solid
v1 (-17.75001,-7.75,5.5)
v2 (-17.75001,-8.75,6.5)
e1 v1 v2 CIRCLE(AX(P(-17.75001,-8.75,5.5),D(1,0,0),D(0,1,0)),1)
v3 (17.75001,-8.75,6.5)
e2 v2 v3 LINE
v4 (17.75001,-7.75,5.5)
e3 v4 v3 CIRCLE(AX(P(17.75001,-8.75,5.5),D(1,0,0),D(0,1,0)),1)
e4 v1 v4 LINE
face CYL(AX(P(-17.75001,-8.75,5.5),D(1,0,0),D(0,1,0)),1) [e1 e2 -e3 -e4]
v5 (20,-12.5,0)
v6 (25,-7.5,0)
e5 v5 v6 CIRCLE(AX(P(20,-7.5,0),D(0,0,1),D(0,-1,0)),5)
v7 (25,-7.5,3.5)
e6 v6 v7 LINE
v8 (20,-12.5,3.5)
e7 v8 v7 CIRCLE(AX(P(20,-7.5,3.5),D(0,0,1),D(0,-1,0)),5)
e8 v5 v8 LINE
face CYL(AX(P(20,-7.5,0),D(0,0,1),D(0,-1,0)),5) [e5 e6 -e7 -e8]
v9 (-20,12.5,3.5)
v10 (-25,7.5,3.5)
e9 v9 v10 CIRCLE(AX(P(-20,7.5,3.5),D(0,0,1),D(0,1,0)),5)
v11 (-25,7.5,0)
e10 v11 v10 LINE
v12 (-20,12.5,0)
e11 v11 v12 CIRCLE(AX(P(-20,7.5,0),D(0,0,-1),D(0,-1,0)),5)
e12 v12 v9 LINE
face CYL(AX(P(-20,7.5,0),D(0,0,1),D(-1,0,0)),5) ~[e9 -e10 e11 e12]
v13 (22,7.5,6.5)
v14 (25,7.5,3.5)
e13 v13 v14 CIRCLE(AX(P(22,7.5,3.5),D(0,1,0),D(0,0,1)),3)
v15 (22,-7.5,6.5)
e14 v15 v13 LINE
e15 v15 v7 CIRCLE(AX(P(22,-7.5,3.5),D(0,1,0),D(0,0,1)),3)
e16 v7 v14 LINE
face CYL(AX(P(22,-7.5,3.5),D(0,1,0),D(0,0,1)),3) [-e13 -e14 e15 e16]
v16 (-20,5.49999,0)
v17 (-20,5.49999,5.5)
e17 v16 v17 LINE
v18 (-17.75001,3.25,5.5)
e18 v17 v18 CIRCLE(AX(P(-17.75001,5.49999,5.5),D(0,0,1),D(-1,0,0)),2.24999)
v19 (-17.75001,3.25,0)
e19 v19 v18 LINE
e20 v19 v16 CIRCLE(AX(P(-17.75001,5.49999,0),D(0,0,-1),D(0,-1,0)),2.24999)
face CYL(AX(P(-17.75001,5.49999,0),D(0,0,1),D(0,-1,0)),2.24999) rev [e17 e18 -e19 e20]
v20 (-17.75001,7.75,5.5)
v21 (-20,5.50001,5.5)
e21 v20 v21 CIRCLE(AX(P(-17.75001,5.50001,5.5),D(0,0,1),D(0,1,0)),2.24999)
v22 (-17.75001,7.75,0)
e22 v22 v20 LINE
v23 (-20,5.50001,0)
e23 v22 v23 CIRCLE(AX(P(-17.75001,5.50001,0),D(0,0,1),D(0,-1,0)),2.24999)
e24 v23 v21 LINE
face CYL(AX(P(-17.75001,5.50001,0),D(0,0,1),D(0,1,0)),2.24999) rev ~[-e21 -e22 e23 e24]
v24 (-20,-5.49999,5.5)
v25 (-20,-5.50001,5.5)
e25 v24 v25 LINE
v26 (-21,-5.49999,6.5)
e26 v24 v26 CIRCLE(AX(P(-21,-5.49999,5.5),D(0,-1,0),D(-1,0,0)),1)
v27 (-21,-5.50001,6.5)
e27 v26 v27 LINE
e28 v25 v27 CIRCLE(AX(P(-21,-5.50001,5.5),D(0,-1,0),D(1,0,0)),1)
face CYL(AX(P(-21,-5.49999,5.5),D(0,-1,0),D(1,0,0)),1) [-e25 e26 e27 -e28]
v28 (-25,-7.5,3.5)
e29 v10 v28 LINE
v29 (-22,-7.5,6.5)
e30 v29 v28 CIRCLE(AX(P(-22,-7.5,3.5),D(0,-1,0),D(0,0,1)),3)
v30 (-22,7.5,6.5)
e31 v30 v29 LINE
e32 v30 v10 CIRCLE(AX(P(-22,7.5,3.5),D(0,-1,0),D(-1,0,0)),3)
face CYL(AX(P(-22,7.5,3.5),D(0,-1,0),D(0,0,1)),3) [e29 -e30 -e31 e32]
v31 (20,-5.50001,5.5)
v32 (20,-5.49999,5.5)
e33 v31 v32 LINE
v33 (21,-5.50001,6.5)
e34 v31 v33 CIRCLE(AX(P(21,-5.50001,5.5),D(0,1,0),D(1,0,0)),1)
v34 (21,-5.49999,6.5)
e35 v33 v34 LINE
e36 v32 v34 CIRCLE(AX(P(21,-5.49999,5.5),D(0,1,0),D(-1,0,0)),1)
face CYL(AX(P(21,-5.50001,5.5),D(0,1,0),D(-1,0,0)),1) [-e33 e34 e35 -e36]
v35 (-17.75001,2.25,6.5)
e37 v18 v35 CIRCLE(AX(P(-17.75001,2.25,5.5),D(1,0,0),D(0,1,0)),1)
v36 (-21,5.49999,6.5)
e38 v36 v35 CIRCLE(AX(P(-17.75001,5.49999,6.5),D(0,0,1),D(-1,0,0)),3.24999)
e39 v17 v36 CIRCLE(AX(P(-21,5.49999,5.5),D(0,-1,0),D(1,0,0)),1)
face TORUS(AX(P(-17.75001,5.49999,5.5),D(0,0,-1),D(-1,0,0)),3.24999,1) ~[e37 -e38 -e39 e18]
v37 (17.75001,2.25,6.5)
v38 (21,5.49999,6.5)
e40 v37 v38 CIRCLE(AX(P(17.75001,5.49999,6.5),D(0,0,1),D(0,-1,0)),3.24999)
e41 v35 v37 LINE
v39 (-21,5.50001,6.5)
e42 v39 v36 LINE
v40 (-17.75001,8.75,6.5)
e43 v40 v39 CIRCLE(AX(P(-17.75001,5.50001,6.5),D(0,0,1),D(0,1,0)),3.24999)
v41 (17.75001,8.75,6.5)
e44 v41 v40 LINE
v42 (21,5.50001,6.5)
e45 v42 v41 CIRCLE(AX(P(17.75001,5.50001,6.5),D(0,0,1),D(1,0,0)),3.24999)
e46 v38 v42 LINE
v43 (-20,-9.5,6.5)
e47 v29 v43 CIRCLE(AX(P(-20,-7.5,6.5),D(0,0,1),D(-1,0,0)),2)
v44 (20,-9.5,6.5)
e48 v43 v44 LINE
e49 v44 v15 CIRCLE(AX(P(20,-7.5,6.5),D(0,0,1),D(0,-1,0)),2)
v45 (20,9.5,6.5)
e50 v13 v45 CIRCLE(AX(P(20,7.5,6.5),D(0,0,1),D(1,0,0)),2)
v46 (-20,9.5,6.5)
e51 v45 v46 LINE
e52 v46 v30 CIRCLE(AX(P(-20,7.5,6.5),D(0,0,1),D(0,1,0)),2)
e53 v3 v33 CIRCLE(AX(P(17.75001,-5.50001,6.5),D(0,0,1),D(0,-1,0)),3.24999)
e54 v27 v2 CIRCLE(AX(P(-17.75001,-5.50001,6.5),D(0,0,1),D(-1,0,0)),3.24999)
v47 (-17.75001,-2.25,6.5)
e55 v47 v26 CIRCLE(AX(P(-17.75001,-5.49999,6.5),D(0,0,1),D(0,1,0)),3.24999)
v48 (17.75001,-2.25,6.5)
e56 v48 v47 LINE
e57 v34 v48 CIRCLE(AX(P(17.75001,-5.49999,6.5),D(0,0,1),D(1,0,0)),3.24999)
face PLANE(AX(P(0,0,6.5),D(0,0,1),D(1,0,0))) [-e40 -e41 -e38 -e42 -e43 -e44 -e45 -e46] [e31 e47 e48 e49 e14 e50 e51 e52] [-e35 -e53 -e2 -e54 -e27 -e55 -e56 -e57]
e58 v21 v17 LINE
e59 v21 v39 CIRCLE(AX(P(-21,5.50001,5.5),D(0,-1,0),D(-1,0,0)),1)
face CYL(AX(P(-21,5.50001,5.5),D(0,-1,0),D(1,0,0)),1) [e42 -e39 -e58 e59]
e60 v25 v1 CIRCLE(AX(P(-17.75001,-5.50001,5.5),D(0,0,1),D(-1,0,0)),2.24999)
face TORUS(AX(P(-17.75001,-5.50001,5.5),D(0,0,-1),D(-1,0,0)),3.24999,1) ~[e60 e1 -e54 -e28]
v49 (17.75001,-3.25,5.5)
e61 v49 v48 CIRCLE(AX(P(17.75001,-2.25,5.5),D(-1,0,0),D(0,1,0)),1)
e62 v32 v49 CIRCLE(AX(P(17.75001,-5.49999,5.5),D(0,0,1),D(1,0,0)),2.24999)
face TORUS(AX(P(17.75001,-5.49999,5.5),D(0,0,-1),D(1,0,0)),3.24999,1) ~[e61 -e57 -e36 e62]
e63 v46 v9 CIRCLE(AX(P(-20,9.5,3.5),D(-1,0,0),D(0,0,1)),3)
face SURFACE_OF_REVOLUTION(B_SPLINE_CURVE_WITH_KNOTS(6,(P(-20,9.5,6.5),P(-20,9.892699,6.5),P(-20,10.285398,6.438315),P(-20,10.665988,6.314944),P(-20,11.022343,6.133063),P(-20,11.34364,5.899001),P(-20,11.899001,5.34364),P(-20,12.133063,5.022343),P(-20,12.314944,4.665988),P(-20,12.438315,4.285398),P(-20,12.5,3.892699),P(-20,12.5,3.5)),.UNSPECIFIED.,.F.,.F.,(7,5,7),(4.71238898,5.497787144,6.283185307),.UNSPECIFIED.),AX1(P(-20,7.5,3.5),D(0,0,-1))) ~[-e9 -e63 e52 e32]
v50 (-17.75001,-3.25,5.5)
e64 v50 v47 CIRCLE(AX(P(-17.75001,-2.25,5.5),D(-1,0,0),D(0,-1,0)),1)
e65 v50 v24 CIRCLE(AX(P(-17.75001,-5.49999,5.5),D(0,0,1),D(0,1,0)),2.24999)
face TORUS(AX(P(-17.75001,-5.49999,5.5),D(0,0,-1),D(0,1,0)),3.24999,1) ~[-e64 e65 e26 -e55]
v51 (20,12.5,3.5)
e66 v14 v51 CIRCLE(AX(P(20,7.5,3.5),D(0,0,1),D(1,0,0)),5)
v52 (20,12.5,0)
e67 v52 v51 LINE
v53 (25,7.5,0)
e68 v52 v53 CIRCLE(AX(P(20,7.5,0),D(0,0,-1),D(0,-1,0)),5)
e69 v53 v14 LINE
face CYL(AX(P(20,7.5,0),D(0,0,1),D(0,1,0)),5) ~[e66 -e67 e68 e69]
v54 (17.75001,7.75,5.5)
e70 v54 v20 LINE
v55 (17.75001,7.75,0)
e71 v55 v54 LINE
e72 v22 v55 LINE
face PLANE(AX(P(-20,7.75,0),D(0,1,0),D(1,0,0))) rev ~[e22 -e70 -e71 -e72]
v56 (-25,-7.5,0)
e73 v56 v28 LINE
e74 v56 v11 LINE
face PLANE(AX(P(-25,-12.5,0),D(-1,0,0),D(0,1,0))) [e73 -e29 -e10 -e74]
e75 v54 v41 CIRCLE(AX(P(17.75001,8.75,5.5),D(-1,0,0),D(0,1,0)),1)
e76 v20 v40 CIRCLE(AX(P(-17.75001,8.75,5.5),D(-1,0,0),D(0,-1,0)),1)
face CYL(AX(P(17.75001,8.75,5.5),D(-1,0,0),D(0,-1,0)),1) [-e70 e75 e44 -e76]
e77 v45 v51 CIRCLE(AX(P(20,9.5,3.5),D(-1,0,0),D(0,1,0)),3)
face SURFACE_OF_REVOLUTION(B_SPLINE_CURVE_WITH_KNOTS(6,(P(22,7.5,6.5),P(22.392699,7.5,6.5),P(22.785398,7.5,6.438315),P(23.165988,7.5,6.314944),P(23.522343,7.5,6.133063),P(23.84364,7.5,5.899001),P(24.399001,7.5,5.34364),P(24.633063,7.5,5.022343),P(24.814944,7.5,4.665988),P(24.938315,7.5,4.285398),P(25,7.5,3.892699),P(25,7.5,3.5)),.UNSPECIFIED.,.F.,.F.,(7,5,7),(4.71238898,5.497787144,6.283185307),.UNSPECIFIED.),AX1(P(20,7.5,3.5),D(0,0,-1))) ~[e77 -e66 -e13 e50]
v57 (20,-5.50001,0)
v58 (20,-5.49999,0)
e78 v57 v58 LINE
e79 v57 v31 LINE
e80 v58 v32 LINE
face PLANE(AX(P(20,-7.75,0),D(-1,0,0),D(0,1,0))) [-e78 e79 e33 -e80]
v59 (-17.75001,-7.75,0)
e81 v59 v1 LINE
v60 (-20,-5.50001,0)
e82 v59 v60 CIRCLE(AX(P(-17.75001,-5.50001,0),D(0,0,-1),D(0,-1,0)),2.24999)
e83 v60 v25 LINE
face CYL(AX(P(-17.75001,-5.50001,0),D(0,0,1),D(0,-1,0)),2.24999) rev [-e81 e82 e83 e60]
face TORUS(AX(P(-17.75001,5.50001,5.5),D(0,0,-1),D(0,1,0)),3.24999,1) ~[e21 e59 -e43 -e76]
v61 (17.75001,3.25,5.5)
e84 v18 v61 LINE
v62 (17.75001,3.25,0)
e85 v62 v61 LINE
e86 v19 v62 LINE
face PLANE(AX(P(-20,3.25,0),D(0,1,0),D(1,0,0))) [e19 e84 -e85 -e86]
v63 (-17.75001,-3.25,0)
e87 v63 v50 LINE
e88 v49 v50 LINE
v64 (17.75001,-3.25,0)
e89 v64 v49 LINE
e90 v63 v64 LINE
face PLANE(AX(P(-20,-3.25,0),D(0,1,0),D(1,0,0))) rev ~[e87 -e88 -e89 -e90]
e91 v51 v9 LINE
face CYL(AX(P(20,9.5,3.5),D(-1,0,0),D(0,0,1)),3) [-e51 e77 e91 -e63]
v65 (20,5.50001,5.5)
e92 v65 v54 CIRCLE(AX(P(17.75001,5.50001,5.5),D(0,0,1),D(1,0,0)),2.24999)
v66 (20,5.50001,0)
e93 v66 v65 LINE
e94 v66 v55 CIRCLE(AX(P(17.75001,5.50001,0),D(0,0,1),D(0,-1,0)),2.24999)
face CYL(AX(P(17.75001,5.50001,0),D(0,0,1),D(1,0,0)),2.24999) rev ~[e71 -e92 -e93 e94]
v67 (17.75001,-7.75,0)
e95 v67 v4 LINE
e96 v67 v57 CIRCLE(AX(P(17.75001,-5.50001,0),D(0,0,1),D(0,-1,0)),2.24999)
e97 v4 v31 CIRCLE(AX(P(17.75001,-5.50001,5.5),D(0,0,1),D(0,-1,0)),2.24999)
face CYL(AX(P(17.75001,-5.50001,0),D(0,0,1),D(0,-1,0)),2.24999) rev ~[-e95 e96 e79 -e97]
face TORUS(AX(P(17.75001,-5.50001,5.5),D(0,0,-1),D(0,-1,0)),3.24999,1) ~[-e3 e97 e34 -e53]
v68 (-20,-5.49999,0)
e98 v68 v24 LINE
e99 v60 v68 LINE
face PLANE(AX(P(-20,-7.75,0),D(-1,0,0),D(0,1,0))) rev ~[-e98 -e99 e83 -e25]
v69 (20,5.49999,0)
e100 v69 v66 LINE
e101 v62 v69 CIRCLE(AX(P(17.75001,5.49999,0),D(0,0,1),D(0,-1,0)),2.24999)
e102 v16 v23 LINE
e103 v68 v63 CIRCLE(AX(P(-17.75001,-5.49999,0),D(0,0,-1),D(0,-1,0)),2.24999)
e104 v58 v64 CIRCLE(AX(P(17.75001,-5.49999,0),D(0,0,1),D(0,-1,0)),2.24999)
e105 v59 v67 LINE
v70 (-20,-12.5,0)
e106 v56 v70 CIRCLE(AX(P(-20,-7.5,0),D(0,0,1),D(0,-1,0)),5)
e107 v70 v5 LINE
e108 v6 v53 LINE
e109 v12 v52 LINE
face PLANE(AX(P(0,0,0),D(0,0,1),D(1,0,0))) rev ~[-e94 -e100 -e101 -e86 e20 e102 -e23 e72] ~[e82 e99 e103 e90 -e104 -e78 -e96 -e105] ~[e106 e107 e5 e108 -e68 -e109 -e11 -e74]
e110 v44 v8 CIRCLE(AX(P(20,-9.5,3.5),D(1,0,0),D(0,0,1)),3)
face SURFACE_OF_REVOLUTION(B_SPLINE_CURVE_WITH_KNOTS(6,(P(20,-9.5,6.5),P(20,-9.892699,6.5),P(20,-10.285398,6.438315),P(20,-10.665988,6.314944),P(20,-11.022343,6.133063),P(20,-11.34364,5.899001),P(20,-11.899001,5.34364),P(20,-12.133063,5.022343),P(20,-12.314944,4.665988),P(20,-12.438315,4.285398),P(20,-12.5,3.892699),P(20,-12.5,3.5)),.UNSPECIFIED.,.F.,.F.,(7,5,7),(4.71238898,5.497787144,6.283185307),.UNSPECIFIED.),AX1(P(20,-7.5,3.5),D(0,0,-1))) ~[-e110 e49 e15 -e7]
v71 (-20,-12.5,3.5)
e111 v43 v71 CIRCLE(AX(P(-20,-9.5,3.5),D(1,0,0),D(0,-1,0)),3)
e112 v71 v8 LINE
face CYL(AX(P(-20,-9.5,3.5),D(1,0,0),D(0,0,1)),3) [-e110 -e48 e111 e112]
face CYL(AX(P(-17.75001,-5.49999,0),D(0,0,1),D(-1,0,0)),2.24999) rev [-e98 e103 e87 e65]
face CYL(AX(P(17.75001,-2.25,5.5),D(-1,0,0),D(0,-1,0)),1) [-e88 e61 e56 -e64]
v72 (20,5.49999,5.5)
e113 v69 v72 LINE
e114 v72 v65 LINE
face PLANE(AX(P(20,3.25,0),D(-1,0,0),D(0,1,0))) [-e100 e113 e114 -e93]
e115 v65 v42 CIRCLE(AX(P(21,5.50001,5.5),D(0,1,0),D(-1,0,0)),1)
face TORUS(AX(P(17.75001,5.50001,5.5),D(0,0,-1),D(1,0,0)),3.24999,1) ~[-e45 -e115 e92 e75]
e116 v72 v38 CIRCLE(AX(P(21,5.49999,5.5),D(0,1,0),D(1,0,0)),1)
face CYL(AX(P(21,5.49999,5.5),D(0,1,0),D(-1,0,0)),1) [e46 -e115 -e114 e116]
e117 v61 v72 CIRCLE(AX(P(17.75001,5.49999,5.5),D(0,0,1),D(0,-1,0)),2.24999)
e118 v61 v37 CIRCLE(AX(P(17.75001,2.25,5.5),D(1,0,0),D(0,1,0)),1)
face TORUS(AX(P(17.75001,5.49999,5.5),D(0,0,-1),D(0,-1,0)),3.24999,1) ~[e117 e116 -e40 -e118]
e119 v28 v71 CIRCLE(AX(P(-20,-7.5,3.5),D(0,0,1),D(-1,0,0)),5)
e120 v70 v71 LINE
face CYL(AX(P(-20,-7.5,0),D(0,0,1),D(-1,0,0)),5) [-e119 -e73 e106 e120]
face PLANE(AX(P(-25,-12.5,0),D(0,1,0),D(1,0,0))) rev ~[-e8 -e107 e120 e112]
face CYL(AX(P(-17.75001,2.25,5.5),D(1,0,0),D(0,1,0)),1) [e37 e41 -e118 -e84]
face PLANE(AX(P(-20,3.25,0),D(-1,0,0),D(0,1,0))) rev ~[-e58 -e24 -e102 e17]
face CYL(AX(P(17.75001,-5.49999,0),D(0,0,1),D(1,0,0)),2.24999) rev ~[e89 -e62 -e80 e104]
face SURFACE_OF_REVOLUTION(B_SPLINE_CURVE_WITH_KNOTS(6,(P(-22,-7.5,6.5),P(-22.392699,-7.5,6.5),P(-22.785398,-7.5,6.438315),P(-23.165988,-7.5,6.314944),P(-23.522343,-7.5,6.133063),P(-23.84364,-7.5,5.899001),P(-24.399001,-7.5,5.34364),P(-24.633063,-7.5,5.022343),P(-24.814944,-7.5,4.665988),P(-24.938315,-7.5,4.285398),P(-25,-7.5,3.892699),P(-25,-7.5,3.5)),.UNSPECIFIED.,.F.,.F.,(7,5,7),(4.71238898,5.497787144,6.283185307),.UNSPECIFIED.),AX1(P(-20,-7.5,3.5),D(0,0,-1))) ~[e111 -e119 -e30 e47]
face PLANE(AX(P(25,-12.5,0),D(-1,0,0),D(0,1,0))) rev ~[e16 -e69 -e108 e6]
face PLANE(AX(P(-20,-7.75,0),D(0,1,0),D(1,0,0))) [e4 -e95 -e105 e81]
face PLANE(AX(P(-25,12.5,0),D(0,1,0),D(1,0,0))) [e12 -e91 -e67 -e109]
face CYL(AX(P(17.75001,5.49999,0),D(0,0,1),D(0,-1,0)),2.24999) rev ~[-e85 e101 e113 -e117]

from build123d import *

# Parameters (mm, degrees)
F0_W     = 50
F0_H     = 25
F0_W_2   = 40
F0_H_2   = 4.5
F1_DEPTH = 6.5
F2_R     = 5
F3_R     = 2.24999
F4_R     = 1
F5_R     = 3


# Not quite as in the source:
# - a fillet or chamfer is up to 0.001 mm smaller than in the source, because OpenCascade refuses the exact size


with BuildPart() as f1:
    # F0 (on Top) → F1 (new body)
    with BuildSketch(Plane.XY):
        Rectangle(F0_W, F0_H)
        with Locations((0, -5.5)):
            Rectangle(F0_W_2, F0_H_2, mode=Mode.SUBTRACT)
        with Locations((0, 5.5)):
            Rectangle(F0_W_2, F0_H_2, mode=Mode.SUBTRACT)
    extrude(amount=F1_DEPTH)

    # F2
    f2_edges = [f1.edges().sort_by_distance(p)[0] for p in [
        (-25, -12.5, 3.25),
        (25, -12.5, 3.25),
        (25, 12.5, 3.25),
        (-25, 12.5, 3.25),
    ]]
    fillet(f2_edges, radius=F2_R)

    # F3 (radius 2.25 in the source; OpenCascade refuses exactly that, so slightly less here)
    f3_edges = [f1.edges().sort_by_distance(p)[0] for p in [
        (-20, -3.25, 3.25),
        (-20, -7.75, 3.25),
        (-20, 3.25, 3.25),
        (-20, 7.75, 3.25),
        (20, -7.75, 3.25),
        (20, -3.25, 3.25),
        (20, 3.25, 3.25),
        (20, 7.75, 3.25),
    ]]
    fillet(f3_edges, radius=F3_R)

    # F4
    f4_edges = [f1.edges().sort_by_distance(p)[0] for p in [
        (0, -7.75, 6.5),
        (0, 3.25, 6.5),
    ]]
    fillet(f4_edges, radius=F4_R)

    # F5
    f5_edges = [f1.edges().sort_by_distance(p)[0] for p in [
        (25, 0, 6.5),
    ]]
    fillet(f5_edges, radius=F5_R)


solid = f1.part
